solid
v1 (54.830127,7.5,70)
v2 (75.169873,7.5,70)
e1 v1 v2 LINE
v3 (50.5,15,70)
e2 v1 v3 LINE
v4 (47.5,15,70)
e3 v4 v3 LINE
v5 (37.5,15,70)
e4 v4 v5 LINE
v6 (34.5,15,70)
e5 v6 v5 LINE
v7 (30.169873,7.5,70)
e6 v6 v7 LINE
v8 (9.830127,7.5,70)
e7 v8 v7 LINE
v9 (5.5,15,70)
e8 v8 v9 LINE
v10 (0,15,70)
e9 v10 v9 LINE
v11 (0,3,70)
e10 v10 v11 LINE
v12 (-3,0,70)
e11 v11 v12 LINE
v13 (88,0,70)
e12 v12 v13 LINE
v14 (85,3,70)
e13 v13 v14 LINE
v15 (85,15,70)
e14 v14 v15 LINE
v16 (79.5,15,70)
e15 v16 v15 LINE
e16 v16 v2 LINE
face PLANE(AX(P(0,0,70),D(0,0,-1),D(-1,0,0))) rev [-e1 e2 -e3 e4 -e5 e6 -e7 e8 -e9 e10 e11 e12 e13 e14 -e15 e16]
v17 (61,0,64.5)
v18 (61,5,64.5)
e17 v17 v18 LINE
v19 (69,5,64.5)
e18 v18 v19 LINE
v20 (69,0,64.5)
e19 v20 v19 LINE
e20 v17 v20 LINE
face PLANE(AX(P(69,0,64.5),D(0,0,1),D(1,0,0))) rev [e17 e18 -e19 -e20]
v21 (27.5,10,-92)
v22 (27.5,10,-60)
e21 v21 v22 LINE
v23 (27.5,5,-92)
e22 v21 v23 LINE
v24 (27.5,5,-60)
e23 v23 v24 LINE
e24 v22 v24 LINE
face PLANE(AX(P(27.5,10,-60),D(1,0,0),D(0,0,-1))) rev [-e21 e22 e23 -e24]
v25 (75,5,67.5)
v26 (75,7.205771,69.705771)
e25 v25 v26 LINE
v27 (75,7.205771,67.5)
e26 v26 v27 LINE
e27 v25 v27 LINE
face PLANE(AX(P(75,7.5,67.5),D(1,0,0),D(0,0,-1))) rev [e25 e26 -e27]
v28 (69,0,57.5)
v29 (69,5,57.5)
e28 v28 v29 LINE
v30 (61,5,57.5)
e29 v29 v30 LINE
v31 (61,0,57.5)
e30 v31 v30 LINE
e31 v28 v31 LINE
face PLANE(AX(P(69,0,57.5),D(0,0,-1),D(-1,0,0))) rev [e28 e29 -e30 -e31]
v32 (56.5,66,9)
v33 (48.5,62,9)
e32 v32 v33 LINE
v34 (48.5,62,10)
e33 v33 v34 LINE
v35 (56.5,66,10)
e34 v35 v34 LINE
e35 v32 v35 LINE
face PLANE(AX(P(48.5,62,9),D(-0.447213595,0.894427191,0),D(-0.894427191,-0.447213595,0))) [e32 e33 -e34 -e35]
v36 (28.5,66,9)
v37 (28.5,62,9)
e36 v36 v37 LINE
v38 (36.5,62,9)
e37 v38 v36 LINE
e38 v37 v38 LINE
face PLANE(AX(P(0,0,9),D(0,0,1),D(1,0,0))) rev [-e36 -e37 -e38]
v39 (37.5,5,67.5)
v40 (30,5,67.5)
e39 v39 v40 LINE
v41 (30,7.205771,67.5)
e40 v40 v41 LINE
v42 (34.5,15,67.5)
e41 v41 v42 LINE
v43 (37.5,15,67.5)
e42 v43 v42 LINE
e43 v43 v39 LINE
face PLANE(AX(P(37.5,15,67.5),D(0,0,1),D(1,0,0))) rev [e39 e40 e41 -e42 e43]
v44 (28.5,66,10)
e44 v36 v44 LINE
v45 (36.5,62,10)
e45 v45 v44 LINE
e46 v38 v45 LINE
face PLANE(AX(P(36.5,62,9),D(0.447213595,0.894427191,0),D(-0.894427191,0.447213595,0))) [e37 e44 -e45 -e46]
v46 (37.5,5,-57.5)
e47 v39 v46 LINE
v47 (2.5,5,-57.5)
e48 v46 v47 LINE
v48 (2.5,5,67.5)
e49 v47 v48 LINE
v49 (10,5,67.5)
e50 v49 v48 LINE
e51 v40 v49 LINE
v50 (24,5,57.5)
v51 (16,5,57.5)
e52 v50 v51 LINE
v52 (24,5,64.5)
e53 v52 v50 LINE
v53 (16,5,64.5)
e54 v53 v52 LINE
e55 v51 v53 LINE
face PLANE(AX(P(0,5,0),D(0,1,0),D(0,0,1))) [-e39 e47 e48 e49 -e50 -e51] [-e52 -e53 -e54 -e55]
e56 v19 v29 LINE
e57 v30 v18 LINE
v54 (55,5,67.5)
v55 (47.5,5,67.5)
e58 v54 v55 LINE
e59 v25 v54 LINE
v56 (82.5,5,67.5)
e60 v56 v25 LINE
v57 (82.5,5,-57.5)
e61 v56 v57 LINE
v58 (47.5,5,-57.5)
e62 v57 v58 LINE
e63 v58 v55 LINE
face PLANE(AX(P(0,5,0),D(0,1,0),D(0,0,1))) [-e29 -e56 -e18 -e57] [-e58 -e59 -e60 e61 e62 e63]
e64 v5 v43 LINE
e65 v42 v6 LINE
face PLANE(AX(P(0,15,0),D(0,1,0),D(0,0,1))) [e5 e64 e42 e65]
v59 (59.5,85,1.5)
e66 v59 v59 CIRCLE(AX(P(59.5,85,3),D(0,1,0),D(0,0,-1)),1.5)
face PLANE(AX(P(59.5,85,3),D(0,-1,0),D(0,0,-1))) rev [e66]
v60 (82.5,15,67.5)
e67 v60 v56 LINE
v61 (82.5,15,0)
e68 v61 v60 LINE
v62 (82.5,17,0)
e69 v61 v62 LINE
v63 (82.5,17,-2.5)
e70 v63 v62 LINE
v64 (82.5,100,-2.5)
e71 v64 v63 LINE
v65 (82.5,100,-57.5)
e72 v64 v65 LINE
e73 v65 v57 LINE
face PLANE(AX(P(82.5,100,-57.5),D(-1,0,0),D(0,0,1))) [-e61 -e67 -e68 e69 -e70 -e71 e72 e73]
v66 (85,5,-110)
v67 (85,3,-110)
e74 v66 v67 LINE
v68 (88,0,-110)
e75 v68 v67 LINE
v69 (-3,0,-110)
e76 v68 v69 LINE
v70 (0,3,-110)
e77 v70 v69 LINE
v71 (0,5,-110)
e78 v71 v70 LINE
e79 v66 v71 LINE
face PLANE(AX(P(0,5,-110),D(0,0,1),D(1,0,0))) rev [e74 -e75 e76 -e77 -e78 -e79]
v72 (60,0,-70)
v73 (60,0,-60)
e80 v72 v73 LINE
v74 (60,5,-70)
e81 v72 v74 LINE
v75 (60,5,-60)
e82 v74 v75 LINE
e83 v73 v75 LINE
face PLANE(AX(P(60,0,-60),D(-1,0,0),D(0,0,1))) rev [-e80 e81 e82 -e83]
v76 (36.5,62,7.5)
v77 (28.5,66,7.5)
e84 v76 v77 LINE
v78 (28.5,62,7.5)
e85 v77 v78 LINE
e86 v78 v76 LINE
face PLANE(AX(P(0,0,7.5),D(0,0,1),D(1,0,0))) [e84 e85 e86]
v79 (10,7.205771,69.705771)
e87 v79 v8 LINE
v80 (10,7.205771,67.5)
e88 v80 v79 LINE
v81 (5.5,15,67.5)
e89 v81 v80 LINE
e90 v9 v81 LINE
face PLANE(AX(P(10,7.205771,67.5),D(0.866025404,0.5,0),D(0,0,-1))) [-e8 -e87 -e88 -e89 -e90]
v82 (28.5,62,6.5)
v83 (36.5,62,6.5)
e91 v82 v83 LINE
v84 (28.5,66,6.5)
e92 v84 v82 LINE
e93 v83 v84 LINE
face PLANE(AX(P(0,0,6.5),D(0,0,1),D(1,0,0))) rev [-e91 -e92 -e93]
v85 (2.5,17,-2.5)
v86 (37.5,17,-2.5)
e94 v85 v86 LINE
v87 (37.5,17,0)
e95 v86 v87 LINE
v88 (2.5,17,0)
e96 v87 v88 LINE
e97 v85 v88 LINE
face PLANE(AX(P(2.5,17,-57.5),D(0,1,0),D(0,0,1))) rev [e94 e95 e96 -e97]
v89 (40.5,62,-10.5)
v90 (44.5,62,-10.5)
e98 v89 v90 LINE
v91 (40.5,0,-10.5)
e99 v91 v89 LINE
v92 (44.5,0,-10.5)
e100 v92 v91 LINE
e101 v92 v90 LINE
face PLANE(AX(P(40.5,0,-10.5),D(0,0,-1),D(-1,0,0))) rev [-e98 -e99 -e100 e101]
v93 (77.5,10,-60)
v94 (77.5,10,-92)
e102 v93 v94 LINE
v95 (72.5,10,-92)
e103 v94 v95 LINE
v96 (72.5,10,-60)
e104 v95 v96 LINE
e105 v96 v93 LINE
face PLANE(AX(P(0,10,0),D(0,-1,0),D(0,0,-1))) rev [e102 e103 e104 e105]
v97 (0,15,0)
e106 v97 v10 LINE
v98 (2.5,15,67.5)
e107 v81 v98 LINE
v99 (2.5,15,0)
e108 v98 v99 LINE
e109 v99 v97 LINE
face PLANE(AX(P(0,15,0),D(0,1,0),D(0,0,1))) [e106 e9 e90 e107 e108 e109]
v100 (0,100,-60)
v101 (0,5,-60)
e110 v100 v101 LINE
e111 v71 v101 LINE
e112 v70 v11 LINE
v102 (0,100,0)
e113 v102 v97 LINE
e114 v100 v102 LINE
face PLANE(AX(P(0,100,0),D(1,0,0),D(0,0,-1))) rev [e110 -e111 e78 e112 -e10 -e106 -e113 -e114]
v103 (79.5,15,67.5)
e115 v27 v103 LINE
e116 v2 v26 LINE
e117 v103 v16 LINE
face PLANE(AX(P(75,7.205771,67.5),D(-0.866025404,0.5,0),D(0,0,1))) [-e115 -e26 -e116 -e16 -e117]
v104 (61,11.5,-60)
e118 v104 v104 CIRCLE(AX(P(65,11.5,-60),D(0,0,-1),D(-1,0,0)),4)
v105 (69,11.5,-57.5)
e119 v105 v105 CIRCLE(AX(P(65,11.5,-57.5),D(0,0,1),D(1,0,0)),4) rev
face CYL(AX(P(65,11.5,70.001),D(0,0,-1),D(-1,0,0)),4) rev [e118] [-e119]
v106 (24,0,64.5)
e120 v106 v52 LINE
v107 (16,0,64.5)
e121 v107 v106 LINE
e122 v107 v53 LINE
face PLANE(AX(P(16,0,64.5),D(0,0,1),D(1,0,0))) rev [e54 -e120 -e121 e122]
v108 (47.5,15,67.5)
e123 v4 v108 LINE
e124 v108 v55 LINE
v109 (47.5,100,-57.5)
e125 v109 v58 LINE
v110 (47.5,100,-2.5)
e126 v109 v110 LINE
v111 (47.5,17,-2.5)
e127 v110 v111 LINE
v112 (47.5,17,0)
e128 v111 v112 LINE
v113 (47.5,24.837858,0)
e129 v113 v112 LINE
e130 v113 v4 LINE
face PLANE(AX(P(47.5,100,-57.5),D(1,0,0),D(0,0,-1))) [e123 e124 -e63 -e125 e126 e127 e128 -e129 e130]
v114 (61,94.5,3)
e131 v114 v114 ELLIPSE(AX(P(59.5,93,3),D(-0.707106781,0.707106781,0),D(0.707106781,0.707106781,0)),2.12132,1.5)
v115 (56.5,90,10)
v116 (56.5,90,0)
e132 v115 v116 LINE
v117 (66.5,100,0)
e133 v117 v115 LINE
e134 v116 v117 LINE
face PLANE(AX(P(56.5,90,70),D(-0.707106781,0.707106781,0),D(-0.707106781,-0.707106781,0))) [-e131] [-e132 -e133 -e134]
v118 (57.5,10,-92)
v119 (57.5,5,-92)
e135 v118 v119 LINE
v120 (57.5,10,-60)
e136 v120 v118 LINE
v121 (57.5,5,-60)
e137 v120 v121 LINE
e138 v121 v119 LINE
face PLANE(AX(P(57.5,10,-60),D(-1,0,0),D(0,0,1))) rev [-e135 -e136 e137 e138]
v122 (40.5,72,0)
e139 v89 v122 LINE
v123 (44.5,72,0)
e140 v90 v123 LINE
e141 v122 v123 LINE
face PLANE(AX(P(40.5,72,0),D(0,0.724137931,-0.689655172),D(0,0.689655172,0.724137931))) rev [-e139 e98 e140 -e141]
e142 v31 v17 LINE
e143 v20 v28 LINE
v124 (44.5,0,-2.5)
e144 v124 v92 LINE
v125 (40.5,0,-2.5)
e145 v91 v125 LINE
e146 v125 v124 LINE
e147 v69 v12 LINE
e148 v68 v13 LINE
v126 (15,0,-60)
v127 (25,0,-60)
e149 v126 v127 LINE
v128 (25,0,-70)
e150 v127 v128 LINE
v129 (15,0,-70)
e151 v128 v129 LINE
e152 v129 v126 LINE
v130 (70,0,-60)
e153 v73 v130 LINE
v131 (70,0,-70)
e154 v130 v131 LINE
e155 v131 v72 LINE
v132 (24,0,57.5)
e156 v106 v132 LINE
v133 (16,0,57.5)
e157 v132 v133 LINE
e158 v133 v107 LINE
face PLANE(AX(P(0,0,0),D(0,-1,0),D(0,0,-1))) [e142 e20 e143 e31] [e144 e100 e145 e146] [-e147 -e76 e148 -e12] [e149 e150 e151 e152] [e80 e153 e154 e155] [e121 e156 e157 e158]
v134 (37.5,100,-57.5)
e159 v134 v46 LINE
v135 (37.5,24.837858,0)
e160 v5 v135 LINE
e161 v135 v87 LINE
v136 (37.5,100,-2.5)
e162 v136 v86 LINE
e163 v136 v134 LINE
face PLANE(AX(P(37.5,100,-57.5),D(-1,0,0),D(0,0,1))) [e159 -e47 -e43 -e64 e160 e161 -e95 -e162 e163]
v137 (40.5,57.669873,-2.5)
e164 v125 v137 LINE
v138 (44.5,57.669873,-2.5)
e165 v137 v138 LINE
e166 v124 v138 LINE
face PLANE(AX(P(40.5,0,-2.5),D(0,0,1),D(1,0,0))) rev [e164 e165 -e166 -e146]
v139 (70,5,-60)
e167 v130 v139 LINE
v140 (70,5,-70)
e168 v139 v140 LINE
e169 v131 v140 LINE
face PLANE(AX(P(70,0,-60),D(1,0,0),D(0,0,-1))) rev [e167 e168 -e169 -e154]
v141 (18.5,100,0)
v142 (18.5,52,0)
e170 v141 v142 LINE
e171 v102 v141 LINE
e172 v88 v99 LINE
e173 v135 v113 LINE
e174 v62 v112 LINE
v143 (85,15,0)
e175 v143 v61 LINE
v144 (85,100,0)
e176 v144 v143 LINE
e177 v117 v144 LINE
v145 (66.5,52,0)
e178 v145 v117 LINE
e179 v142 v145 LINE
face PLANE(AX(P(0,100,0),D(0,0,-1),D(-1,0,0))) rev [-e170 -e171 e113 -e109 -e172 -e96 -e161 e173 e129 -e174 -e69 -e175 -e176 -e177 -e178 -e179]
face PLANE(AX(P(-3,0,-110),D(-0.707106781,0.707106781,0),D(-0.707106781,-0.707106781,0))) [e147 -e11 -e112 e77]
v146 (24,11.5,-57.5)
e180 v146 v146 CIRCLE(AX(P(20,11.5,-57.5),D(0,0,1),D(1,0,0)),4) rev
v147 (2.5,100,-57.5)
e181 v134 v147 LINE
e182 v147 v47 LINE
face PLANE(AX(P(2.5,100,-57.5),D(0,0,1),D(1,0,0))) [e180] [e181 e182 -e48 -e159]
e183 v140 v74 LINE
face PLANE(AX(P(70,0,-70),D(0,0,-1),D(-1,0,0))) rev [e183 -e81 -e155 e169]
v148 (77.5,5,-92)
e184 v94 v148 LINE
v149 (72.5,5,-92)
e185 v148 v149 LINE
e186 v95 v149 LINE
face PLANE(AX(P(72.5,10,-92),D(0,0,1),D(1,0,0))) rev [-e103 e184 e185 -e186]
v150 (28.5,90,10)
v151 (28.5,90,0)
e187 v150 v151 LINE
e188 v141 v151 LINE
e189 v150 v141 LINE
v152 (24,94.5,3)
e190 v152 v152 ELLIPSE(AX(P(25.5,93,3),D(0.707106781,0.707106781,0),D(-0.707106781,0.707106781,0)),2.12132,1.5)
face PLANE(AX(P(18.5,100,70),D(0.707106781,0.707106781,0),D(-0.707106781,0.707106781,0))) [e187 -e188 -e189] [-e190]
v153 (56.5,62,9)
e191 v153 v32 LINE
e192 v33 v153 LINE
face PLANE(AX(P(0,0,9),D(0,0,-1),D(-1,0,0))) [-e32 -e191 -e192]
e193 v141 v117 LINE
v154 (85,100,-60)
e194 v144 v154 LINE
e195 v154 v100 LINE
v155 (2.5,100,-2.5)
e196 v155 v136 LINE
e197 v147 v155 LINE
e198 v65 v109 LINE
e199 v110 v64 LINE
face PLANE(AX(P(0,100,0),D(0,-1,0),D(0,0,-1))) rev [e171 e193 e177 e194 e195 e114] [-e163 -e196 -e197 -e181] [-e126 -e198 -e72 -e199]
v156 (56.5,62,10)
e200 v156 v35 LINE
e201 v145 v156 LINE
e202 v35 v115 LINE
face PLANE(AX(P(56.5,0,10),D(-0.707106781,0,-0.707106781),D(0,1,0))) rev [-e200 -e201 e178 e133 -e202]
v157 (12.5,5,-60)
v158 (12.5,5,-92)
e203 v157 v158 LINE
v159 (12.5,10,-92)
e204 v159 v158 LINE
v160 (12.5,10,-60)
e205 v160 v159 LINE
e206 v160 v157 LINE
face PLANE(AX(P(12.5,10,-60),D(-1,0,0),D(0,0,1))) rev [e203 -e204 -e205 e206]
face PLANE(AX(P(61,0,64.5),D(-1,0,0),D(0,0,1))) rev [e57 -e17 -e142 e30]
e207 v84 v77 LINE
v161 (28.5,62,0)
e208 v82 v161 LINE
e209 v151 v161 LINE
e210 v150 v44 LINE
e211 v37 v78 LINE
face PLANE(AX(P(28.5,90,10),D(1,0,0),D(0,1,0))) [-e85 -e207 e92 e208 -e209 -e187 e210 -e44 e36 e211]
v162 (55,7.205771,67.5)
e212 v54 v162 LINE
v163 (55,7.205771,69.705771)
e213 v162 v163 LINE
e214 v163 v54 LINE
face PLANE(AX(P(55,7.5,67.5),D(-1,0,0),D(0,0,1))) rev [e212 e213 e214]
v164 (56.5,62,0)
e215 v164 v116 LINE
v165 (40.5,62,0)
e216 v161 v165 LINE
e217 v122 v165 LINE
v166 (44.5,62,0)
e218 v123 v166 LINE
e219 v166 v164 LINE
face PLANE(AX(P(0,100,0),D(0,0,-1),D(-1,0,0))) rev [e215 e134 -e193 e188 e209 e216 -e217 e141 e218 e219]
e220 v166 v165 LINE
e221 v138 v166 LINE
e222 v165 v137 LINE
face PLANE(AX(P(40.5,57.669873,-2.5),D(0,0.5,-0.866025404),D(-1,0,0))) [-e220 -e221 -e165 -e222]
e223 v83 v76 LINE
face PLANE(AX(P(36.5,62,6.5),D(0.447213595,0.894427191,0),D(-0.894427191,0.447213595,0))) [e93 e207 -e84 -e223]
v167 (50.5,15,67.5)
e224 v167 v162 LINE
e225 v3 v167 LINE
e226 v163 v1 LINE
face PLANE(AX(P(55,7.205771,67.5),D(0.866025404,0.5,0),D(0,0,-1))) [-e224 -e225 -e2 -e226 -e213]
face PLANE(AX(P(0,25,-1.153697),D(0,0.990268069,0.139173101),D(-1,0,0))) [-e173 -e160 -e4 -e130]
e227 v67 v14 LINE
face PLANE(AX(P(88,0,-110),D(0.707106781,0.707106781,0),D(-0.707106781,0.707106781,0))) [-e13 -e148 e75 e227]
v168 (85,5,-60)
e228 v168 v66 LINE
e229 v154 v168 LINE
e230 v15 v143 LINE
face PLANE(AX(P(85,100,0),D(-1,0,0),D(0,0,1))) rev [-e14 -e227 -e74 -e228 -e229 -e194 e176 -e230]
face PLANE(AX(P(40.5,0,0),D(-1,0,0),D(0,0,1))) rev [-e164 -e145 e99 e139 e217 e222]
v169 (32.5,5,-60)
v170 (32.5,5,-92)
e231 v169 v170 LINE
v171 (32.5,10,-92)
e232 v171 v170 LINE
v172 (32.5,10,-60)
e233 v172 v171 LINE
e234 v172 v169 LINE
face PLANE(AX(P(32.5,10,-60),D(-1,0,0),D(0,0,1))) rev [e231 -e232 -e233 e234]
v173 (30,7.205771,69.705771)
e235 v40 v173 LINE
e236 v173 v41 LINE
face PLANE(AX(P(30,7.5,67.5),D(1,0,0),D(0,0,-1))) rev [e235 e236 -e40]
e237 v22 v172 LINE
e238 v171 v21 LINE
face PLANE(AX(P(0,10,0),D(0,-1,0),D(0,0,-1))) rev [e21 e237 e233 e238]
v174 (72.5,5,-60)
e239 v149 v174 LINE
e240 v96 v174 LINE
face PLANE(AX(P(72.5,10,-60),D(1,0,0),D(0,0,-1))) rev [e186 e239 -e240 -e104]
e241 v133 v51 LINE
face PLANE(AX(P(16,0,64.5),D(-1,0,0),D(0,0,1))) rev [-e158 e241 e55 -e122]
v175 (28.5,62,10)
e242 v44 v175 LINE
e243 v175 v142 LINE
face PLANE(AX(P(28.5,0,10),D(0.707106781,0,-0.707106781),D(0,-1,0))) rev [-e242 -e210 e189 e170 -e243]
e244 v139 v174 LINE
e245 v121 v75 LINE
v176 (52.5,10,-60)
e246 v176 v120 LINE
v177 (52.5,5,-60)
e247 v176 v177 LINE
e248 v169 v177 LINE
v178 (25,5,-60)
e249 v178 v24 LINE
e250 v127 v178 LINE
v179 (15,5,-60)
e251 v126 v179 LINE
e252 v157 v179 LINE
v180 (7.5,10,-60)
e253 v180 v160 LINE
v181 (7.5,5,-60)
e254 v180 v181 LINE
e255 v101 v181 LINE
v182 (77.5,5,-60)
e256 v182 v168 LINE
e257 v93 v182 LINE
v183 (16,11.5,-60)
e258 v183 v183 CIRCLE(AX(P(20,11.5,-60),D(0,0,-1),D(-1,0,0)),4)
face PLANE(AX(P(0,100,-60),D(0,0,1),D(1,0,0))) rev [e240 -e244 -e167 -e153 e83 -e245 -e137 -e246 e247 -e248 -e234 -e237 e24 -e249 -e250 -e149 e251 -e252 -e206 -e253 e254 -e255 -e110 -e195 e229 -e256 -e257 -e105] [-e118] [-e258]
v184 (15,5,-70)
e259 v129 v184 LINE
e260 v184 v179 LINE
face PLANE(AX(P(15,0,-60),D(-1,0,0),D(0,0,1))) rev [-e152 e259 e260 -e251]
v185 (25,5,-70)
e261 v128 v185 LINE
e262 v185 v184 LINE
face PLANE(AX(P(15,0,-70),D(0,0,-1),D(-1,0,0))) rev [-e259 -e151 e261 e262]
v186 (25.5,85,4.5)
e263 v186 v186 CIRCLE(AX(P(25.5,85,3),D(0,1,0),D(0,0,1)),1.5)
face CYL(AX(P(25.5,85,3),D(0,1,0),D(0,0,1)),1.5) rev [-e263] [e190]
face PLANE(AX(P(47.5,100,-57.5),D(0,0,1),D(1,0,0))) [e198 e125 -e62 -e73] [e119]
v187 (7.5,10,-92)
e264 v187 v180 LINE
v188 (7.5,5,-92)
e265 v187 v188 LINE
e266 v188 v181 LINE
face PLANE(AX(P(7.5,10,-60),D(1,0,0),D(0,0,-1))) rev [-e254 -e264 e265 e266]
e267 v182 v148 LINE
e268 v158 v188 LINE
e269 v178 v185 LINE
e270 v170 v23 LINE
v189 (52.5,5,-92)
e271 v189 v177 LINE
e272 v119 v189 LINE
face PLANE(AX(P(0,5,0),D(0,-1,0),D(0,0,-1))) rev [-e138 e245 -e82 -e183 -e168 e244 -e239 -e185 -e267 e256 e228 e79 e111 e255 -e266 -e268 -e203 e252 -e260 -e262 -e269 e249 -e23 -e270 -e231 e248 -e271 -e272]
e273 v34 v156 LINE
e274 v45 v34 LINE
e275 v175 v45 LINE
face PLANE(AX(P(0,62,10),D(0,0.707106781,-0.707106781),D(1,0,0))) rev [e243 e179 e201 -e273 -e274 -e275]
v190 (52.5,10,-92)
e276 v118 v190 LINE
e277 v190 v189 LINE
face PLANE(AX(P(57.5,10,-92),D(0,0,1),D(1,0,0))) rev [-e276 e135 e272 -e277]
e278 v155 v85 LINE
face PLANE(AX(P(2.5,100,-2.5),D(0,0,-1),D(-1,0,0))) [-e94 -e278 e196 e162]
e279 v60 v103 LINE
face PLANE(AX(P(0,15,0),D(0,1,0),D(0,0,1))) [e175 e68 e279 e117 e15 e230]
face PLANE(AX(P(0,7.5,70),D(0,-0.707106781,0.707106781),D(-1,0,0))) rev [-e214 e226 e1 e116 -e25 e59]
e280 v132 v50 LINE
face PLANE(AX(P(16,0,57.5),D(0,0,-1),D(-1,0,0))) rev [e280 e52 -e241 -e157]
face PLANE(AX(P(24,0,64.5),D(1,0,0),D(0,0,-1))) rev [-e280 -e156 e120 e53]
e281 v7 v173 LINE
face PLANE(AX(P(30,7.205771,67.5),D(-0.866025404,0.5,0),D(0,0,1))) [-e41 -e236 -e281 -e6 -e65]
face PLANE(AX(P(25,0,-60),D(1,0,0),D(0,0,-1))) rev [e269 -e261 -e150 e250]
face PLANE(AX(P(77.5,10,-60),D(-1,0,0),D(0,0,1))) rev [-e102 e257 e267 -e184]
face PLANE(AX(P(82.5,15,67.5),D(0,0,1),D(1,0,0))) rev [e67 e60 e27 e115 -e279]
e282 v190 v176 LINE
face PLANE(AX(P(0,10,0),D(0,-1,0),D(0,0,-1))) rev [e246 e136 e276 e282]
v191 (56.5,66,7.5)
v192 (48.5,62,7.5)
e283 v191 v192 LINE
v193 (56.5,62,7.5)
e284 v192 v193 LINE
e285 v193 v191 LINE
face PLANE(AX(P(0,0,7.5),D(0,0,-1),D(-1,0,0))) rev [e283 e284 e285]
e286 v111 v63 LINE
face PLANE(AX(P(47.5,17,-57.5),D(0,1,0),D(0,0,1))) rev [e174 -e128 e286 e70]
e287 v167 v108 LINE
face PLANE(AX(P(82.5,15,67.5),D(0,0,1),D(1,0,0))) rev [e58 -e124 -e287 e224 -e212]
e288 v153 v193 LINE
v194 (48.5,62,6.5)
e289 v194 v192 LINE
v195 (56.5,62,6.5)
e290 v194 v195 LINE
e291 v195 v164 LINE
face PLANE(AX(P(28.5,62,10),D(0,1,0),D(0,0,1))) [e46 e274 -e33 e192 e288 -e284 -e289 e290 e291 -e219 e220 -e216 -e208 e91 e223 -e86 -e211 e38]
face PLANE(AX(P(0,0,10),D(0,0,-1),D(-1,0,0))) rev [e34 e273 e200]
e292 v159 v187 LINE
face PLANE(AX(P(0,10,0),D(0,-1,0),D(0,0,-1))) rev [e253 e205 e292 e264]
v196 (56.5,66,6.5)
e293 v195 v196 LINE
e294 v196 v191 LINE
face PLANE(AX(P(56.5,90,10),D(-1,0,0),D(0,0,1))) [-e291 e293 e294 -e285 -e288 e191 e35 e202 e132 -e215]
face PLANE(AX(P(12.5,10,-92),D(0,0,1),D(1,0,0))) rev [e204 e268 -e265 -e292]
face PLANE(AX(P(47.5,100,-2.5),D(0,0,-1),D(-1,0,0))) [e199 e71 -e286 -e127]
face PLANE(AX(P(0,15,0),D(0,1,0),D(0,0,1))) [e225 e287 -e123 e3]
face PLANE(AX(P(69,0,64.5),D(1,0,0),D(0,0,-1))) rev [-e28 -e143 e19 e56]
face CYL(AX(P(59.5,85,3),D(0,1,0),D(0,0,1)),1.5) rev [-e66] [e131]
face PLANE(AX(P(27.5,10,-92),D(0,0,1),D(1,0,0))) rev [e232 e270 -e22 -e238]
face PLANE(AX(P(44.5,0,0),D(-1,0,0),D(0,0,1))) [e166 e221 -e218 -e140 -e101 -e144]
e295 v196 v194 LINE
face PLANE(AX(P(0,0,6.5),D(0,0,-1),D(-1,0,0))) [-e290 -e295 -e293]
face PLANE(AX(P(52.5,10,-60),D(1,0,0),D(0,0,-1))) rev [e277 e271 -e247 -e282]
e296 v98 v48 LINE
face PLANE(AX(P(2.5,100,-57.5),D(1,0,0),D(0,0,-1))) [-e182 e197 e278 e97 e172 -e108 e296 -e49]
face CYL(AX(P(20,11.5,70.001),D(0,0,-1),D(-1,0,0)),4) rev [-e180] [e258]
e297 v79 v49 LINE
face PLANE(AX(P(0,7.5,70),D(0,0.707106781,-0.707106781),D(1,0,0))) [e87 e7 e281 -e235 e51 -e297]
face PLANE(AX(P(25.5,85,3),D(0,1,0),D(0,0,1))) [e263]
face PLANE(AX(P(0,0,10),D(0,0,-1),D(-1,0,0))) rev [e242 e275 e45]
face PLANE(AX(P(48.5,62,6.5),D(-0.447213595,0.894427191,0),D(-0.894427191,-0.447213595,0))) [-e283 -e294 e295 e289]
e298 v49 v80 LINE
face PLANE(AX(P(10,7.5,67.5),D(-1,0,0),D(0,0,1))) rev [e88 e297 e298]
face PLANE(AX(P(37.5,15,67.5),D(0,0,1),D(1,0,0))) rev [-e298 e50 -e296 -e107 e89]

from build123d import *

# Parameters (mm, degrees)
SKETCH1_W                                 = 85
SKETCH1_H                                 = 60
BOSS_EXTRUDE1_DEPTH                       = 100
CUT_EXTRUDE1_START                        = 5
SKETCH2_W                                 = 35
SKETCH2_H                                 = 55
CUT_EXTRUDE1_DEPTH                        = 95
SKETCH3_W                                 = 85
SKETCH3_H                                 = 5
BOSS_EXTRUDE2_DEPTH                       = 70
BOSS_EXTRUDE3_DEPTH                       = 10
SKETCH5_W                                 = 20
SKETCH5_H                                 = 2.5
CUT_EXTRUDE2_DEPTH                        = 7.5
SKETCH6_W                                 = 35
SKETCH6_H                                 = 12
CUT_EXTRUDE4_DEPTH                        = 57.5
CUT_EXTRUDE6_REACH                        = 186.73
SKETCH7_R                                 = 4
SKETCH9_W                                 = 85
SKETCH9_H                                 = 50
BOSS_EXTRUDE4_DEPTH                       = 5
SKETCH13_W                                = 8
SKETCH13_H                                = 7
CUT_EXTRUDE8_BUTTON_HOLES_DEPTH           = 169.374582405
SKETCH14_W                                = 28
SKETCH14_H                                = 28
BOSS_EXTRUDE5_OLED_MOUNT_DEPTH            = 10
BOSS_EXTRUDE6_OLED_MOUNT_DEPTH            = 1
BOSS_EXTRUDE7_START                       = -2.5
BOSS_EXTRUDE7_OLED_MOUNT_DEPTH            = 1
CHAMFER2_OLED_MOUNT_SIZE                  = 10
CUT_EXTRUDE7_START                        = -40.5
CUT_EXTRUDE7_OLED_CABLE_HOLE_DEPTH        = 4
CUT_EXTRUDE7_ROOF_CUTOUT_DEPTH            = 172.245437895
SKETCH18_W                                = 4
SKETCH18_H                                = 8
CUT_EXTRUDE9_OLED_CABLE_DEPTH             = 153.213665615
CHAMFER6_OLED_CABLE_HOLE_SIZE             = 2.5
CHAMFER6_OLED_CABLE_HOLE_SIZE2            = 4.330127019
SKETCH45_R                                = 1.5
CUT_EXTRUDE7_ROOF_HOLES_DEPTH             = 15
SKETCH20_W                                = 10
SKETCH20_H                                = 10
CUT_EXTRUDE10_SOLENOID_WIRE_HOLE_DEPTH    = 169.374582405
SKETCH21_W                                = 5
SKETCH21_H                                = 32
BOSS_EXTRUDE9_SOLENOID_SIDE_SUPPORT_DEPTH = 5
CHAMFER3_THUMB_SIZE                       = 2.5
CHAMFER5_THUMB_SIZE                       = 4.5
CHAMFER5_THUMB_SIZE2                      = 7.794228634
CHAMFER5_THUMB_PART_2_SIZE                = 4.5
CHAMFER5_THUMB_PART_2_SIZE2               = 7.794228634
CHAMFER5_THUMB_PART_3_SIZE                = 4.5
CHAMFER5_THUMB_PART_3_SIZE2               = 7.794228634
BOSS_EXTRUDE5_GUIDE_DEPTH                 = 180
SKETCH42_W                                = 10
SKETCH42_H                                = 70
BOSS_EXTRUDE8_DEPTH                       = 10
CHAMFER5_SIZE                             = 10
CHAMFER5_SIZE_2                           = 71.153697224


# Some blends are built 0.0001 mm under size
with BuildPart() as part:
    # Sketch1 → Boss-Extrude1 (new body)
    with BuildSketch(Plane(origin=(0, 0, 0), x_dir=(1, 0, 0), z_dir=(0, 1, 0))):
        with Locations((42.5, 30)):
            Rectangle(SKETCH1_W, SKETCH1_H)
    extrude(amount=BOSS_EXTRUDE1_DEPTH)

    # Sketch2 → Cut-Extrude1 (cut)
    with BuildSketch(Plane(origin=(0, 0, 0), x_dir=(1, 0, 0), z_dir=(0, 1, 0)).offset(CUT_EXTRUDE1_START)):
        with Locations((20, 30)):
            Rectangle(SKETCH2_W, SKETCH2_H)
        with Locations((65, 30)):
            Rectangle(SKETCH2_W, SKETCH2_H)
    extrude(amount=CUT_EXTRUDE1_DEPTH, mode=Mode.SUBTRACT)

    # Sketch3 → Boss-Extrude2 (add)
    with BuildSketch(Plane.XY):
        with Locations((42.5, 2.5)):
            Rectangle(SKETCH3_W, SKETCH3_H)
    extrude(amount=BOSS_EXTRUDE2_DEPTH)

    # Sketch4 → Boss-Extrude3 (add)
    with BuildSketch(Plane(origin=(0, 5, 0), x_dir=(1, 0, 0), z_dir=(0, 1, 0))):
        Polygon((85, 0), (82.5, 0), (82.5, -67.5), (47.5, -67.5), (47.5, 0), (37.5, 0), (37.5, -67.5), (2.5, -67.5), (2.5, 0), (0, 0), (0, -70), (85, -70), align=None)
    extrude(amount=BOSS_EXTRUDE3_DEPTH)

    # Sketch5 → Cut-Extrude2 (cut)
    with BuildSketch(Plane(origin=(0, 15, 0), x_dir=(1, 0, 0), z_dir=(0, 1, 0))):
        with Locations((20, -68.75)):
            Rectangle(SKETCH5_W, SKETCH5_H)
        with Locations((65, -68.75)):
            Rectangle(SKETCH5_W, SKETCH5_H)
    extrude(amount=-CUT_EXTRUDE2_DEPTH, mode=Mode.SUBTRACT)

    # Sketch6 → Cut-Extrude4 (cut)
    with BuildSketch(Plane.XY):
        with Locations((20, 11)):
            Rectangle(SKETCH6_W, SKETCH6_H)
        with Locations((65, 11)):
            Rectangle(SKETCH6_W, SKETCH6_H)
    extrude(amount=-CUT_EXTRUDE4_DEPTH, mode=Mode.SUBTRACT)

    # Sketch7 → Cut-Extrude6 (cut, up to next)
    with BuildSketch(Plane(origin=(0, 0, -60), x_dir=(-1, 0, 0), z_dir=(0, 0, -1)), mode=Mode.PRIVATE) as cut_extrude6_sk1:
        with Locations((-20, 11.5)):
            Circle(SKETCH7_R)
    cut_extrude6_tool1 = extrude(cut_extrude6_sk1.sketch, amount=-CUT_EXTRUDE6_REACH, mode=Mode.PRIVATE) & part.part
    # Sketch7 → Cut-Extrude6 (cut, up to next)
    with BuildSketch(Plane(origin=(0, 0, -60), x_dir=(-1, 0, 0), z_dir=(0, 0, -1)), mode=Mode.PRIVATE) as cut_extrude6_sk2:
        with Locations((-65, 11.5)):
            Circle(SKETCH7_R)
    cut_extrude6_tool2 = extrude(cut_extrude6_sk2.sketch, amount=-CUT_EXTRUDE6_REACH, mode=Mode.PRIVATE) & part.part
    add(cut_extrude6_tool1.solids().sort_by_distance((20, 11.5, -60))[0], mode=Mode.SUBTRACT)
    add(cut_extrude6_tool2.solids().sort_by_distance((65, 11.5, -60))[0], mode=Mode.SUBTRACT)

    # Sketch9 → Boss-Extrude4 (add)
    with BuildSketch(Plane(origin=(0, 0, 0), x_dir=(1, 0, 0), z_dir=(0, 1, 0))):
        with Locations((42.5, 85)):
            Rectangle(SKETCH9_W, SKETCH9_H)
    extrude(amount=BOSS_EXTRUDE4_DEPTH)

    # Sketch13 → Cut-Extrude8 (Button Holes) (cut, through all)
    with BuildSketch(Plane(origin=(0, 5, 0), x_dir=(1, 0, 0), z_dir=(0, 1, 0))):
        with Locations((20, -61)):
            Rectangle(SKETCH13_W, SKETCH13_H)
        with Locations((65, -61)):
            Rectangle(SKETCH13_W, SKETCH13_H)
    extrude(amount=-CUT_EXTRUDE8_BUTTON_HOLES_DEPTH, mode=Mode.SUBTRACT)

    # Sketch14 → Boss-Extrude5 (OLED Mount) (add)
    with BuildSketch(Plane.XY):
        Polygon((18.5, 93.172660782), (18.5, 52), (66.5, 52), (66.5, 93.172660782), (66.5, 100), (18.5, 100), align=None)
        with Locations((42.5, 76)):
            Rectangle(SKETCH14_W, SKETCH14_H, mode=Mode.SUBTRACT)
    extrude(amount=BOSS_EXTRUDE5_OLED_MOUNT_DEPTH)

    # Sketch40 → Boss-Extrude6 (OLED Mount) (add)
    with BuildSketch(Plane.XY.offset(10)):
        Polygon((28.5, 62), (36.5, 62), (28.5, 66), align=None)
        Polygon((56.5, 62), (48.5, 62), (56.5, 66), align=None)
    extrude(amount=-BOSS_EXTRUDE6_OLED_MOUNT_DEPTH)

    # Sketch40<2> → Boss-Extrude7 (OLED Mount) (add)
    with BuildSketch(Plane.XY.offset(10).offset(BOSS_EXTRUDE7_START)):
        Polygon((28.5, 62), (36.5, 62), (28.5, 66), align=None)
        Polygon((56.5, 62), (48.5, 62), (56.5, 66), align=None)
    extrude(amount=-BOSS_EXTRUDE7_OLED_MOUNT_DEPTH)

    # Chamfer2 (OLED Mount)
    chamfer2_oled_mount_edges = [part.edges().sort_by_distance(p)[0] for p in [
        (42.5, 52, 10),
        (66.5, 76, 10),
        (42.5, 100, 10),
        (18.5, 76, 10),
    ]]
    chamfer(chamfer2_oled_mount_edges, length=CHAMFER2_OLED_MOUNT_SIZE - 0.0001)  # a hair under: the kernel refuses the full size

    # Sketch44 → Cut-Extrude7 (OLED Cable Hole) (cut)
    with BuildSketch(Plane(origin=(85, 0, 0), x_dir=(0, 0, -1), z_dir=(1, 0, 0)).offset(CUT_EXTRUDE7_START)):
        Polygon((0, 62), (0, 72), (10.5, 62), align=None)
    extrude(amount=-CUT_EXTRUDE7_OLED_CABLE_HOLE_DEPTH, mode=Mode.SUBTRACT)

    # Sketch41 → Cut-Extrude7 (Roof Cutout) (cut, through all)
    with BuildSketch(Plane.XY):
        Polygon((18.5, 100), (28.5, 90), (56.5, 90), (66.5, 100), align=None)
    extrude(amount=CUT_EXTRUDE7_ROOF_CUTOUT_DEPTH, mode=Mode.SUBTRACT)

    # Sketch18 → Cut-Extrude9 (OLED Cable) (cut, through all)
    with BuildSketch(Plane(origin=(0, 62, 0), x_dir=(1, 0, 0), z_dir=(0, 1, 0))):
        with Locations((42.5, 6.5)):
            Rectangle(SKETCH18_W, SKETCH18_H)
    extrude(amount=-CUT_EXTRUDE9_OLED_CABLE_DEPTH, mode=Mode.SUBTRACT)

    # Chamfer6 (OLED Cable Hole)
    chamfer6_oled_cable_hole_edges = [part.edges().sort_by_distance(p)[0] for p in [
        (42.5, 62, -2.5),
    ]]
    chamfer6_oled_cable_hole_side = [part.faces().sort_by_distance(p)[0] for p in [
        (42.5, 62, 4.354651163),
    ]]
    chamfer(chamfer6_oled_cable_hole_edges, length=CHAMFER6_OLED_CABLE_HOLE_SIZE, length2=CHAMFER6_OLED_CABLE_HOLE_SIZE2, reference=chamfer6_oled_cable_hole_side[0])

    # Sketch45 → Cut-Extrude7 (Roof Holes) (cut)
    with BuildSketch(Plane(origin=(0, 100, 0), x_dir=(1, 0, 0), z_dir=(0, 1, 0))):
        with Locations(Location((25.5, -3, 0), (0, 0, 270))):
            Circle(SKETCH45_R)
        with Locations((59.5, -3)):
            Circle(SKETCH45_R)
    extrude(amount=-CUT_EXTRUDE7_ROOF_HOLES_DEPTH, mode=Mode.SUBTRACT)

    # Sketch20 → Cut-Extrude10 (Solenoid Wire Hole) (cut, through all)
    with BuildSketch(Plane(origin=(0, 5, 0), x_dir=(1, 0, 0), z_dir=(0, 1, 0))):
        with Locations((65, 65)):
            Rectangle(SKETCH20_W, SKETCH20_H)
        with Locations((20, 65)):
            Rectangle(SKETCH20_W, SKETCH20_H)
    extrude(amount=-CUT_EXTRUDE10_SOLENOID_WIRE_HOLE_DEPTH, mode=Mode.SUBTRACT)

    # Sketch21 → Boss-Extrude9 (Solenoid Side Support) (add)
    with BuildSketch(Plane(origin=(0, 5, 0), x_dir=(1, 0, 0), z_dir=(0, 1, 0))):
        with Locations((75, 76)):
            Rectangle(SKETCH21_W, SKETCH21_H)
        with Locations((55, 76)):
            Rectangle(SKETCH21_W, SKETCH21_H)
        with Locations((30, 76)):
            Rectangle(SKETCH21_W, SKETCH21_H)
        with Locations((10, 76)):
            Rectangle(SKETCH21_W, SKETCH21_H)
    extrude(amount=BOSS_EXTRUDE9_SOLENOID_SIDE_SUPPORT_DEPTH)

    # Chamfer3 (Thumb)
    chamfer3_thumb_edges = [part.edges().sort_by_distance(p)[0] for p in [
        (20, 7.5, 67.5),
        (65, 7.5, 67.5),
    ]]
    chamfer(chamfer3_thumb_edges, length=CHAMFER3_THUMB_SIZE - 0.0001)  # a hair under: the kernel refuses the full size

    # Chamfer5 (Thumb)
    chamfer5_thumb_edges = [part.edges().sort_by_distance(p)[0] for p in [
        (75, 15, 68.75),
    ]]
    chamfer5_thumb_side = [part.faces().sort_by_distance(p)[0] for p in [
        (83.266129032, 15, 38.266129032),
    ]]
    chamfer(chamfer5_thumb_edges, length=CHAMFER5_THUMB_SIZE, length2=CHAMFER5_THUMB_SIZE2, reference=chamfer5_thumb_side[0])

    # Chamfer5 (Thumb) part 2
    chamfer5_thumb_part_2_edges = [part.edges().sort_by_distance(p)[0] for p in [
        (55, 15, 68.75),
        (30, 15, 68.75),
    ]]
    chamfer5_thumb_part_2_side = [part.faces().sort_by_distance(p)[0] for p in [
        (42.5, 15, 36.716101695),
    ]]
    chamfer(chamfer5_thumb_part_2_edges, length=CHAMFER5_THUMB_PART_2_SIZE, length2=CHAMFER5_THUMB_PART_2_SIZE2, reference=chamfer5_thumb_part_2_side[0])

    # Chamfer5 (Thumb) part 3
    chamfer5_thumb_part_3_edges = [part.edges().sort_by_distance(p)[0] for p in [
        (10, 15, 68.75),
    ]]
    chamfer5_thumb_part_3_side = [part.faces().sort_by_distance(p)[0] for p in [
        (1.733870968, 15, 38.266129032),
    ]]
    chamfer(chamfer5_thumb_part_3_edges, length=CHAMFER5_THUMB_PART_3_SIZE, length2=CHAMFER5_THUMB_PART_3_SIZE2, reference=chamfer5_thumb_part_3_side[0])

    # Sketch37 → Boss-Extrude5 (Guide) (add, through all)
    with BuildSketch(Plane.XY.offset(70)):
        Polygon((85, 0), (88, 0), (85, 3), align=None)
        Polygon((0, 0), (-3, 0), (0, 3), align=None)
    extrude(amount=-BOSS_EXTRUDE5_GUIDE_DEPTH)

    # Sketch42 → Boss-Extrude8 (add)
    with BuildSketch(Plane(origin=(0, 15, 0), x_dir=(1, 0, 0), z_dir=(0, 1, 0))):
        with Locations((42.5, -35)):
            Rectangle(SKETCH42_W, SKETCH42_H)
    extrude(amount=BOSS_EXTRUDE8_DEPTH)

    # Chamfer5
    # the kernel refuses this chamfer: 71.153697224, 10 mm, written as the material it takes off along each edge
    with BuildSketch(Plane(origin=(232.433017826, 25, 70), x_dir=(0, -0.965159882585439, 0.2616608511941778), z_dir=(-1, 0, 0))) as chamfer5_piece_1_section:
        Polygon((CHAMFER5_SIZE * 0.965159882585, -CHAMFER5_SIZE * 0.261660851194), (-CHAMFER5_SIZE_2 * 0.261660851194, -CHAMFER5_SIZE_2 * 0.965159882583), (0, 0), align=None)
    chamfer5_piece_1 = extrude(amount=379.866035651, mode=Mode.PRIVATE)
    chamfer5_piece_1 = split(chamfer5_piece_1, bisect_by=Plane(origin=(42.5, 22.433038023, 0), z_dir=(0, 0, 1)), keep=Keep.TOP, mode=Mode.PRIVATE)
    add(chamfer5_piece_1, mode=Mode.SUBTRACT)


solid = part.part
